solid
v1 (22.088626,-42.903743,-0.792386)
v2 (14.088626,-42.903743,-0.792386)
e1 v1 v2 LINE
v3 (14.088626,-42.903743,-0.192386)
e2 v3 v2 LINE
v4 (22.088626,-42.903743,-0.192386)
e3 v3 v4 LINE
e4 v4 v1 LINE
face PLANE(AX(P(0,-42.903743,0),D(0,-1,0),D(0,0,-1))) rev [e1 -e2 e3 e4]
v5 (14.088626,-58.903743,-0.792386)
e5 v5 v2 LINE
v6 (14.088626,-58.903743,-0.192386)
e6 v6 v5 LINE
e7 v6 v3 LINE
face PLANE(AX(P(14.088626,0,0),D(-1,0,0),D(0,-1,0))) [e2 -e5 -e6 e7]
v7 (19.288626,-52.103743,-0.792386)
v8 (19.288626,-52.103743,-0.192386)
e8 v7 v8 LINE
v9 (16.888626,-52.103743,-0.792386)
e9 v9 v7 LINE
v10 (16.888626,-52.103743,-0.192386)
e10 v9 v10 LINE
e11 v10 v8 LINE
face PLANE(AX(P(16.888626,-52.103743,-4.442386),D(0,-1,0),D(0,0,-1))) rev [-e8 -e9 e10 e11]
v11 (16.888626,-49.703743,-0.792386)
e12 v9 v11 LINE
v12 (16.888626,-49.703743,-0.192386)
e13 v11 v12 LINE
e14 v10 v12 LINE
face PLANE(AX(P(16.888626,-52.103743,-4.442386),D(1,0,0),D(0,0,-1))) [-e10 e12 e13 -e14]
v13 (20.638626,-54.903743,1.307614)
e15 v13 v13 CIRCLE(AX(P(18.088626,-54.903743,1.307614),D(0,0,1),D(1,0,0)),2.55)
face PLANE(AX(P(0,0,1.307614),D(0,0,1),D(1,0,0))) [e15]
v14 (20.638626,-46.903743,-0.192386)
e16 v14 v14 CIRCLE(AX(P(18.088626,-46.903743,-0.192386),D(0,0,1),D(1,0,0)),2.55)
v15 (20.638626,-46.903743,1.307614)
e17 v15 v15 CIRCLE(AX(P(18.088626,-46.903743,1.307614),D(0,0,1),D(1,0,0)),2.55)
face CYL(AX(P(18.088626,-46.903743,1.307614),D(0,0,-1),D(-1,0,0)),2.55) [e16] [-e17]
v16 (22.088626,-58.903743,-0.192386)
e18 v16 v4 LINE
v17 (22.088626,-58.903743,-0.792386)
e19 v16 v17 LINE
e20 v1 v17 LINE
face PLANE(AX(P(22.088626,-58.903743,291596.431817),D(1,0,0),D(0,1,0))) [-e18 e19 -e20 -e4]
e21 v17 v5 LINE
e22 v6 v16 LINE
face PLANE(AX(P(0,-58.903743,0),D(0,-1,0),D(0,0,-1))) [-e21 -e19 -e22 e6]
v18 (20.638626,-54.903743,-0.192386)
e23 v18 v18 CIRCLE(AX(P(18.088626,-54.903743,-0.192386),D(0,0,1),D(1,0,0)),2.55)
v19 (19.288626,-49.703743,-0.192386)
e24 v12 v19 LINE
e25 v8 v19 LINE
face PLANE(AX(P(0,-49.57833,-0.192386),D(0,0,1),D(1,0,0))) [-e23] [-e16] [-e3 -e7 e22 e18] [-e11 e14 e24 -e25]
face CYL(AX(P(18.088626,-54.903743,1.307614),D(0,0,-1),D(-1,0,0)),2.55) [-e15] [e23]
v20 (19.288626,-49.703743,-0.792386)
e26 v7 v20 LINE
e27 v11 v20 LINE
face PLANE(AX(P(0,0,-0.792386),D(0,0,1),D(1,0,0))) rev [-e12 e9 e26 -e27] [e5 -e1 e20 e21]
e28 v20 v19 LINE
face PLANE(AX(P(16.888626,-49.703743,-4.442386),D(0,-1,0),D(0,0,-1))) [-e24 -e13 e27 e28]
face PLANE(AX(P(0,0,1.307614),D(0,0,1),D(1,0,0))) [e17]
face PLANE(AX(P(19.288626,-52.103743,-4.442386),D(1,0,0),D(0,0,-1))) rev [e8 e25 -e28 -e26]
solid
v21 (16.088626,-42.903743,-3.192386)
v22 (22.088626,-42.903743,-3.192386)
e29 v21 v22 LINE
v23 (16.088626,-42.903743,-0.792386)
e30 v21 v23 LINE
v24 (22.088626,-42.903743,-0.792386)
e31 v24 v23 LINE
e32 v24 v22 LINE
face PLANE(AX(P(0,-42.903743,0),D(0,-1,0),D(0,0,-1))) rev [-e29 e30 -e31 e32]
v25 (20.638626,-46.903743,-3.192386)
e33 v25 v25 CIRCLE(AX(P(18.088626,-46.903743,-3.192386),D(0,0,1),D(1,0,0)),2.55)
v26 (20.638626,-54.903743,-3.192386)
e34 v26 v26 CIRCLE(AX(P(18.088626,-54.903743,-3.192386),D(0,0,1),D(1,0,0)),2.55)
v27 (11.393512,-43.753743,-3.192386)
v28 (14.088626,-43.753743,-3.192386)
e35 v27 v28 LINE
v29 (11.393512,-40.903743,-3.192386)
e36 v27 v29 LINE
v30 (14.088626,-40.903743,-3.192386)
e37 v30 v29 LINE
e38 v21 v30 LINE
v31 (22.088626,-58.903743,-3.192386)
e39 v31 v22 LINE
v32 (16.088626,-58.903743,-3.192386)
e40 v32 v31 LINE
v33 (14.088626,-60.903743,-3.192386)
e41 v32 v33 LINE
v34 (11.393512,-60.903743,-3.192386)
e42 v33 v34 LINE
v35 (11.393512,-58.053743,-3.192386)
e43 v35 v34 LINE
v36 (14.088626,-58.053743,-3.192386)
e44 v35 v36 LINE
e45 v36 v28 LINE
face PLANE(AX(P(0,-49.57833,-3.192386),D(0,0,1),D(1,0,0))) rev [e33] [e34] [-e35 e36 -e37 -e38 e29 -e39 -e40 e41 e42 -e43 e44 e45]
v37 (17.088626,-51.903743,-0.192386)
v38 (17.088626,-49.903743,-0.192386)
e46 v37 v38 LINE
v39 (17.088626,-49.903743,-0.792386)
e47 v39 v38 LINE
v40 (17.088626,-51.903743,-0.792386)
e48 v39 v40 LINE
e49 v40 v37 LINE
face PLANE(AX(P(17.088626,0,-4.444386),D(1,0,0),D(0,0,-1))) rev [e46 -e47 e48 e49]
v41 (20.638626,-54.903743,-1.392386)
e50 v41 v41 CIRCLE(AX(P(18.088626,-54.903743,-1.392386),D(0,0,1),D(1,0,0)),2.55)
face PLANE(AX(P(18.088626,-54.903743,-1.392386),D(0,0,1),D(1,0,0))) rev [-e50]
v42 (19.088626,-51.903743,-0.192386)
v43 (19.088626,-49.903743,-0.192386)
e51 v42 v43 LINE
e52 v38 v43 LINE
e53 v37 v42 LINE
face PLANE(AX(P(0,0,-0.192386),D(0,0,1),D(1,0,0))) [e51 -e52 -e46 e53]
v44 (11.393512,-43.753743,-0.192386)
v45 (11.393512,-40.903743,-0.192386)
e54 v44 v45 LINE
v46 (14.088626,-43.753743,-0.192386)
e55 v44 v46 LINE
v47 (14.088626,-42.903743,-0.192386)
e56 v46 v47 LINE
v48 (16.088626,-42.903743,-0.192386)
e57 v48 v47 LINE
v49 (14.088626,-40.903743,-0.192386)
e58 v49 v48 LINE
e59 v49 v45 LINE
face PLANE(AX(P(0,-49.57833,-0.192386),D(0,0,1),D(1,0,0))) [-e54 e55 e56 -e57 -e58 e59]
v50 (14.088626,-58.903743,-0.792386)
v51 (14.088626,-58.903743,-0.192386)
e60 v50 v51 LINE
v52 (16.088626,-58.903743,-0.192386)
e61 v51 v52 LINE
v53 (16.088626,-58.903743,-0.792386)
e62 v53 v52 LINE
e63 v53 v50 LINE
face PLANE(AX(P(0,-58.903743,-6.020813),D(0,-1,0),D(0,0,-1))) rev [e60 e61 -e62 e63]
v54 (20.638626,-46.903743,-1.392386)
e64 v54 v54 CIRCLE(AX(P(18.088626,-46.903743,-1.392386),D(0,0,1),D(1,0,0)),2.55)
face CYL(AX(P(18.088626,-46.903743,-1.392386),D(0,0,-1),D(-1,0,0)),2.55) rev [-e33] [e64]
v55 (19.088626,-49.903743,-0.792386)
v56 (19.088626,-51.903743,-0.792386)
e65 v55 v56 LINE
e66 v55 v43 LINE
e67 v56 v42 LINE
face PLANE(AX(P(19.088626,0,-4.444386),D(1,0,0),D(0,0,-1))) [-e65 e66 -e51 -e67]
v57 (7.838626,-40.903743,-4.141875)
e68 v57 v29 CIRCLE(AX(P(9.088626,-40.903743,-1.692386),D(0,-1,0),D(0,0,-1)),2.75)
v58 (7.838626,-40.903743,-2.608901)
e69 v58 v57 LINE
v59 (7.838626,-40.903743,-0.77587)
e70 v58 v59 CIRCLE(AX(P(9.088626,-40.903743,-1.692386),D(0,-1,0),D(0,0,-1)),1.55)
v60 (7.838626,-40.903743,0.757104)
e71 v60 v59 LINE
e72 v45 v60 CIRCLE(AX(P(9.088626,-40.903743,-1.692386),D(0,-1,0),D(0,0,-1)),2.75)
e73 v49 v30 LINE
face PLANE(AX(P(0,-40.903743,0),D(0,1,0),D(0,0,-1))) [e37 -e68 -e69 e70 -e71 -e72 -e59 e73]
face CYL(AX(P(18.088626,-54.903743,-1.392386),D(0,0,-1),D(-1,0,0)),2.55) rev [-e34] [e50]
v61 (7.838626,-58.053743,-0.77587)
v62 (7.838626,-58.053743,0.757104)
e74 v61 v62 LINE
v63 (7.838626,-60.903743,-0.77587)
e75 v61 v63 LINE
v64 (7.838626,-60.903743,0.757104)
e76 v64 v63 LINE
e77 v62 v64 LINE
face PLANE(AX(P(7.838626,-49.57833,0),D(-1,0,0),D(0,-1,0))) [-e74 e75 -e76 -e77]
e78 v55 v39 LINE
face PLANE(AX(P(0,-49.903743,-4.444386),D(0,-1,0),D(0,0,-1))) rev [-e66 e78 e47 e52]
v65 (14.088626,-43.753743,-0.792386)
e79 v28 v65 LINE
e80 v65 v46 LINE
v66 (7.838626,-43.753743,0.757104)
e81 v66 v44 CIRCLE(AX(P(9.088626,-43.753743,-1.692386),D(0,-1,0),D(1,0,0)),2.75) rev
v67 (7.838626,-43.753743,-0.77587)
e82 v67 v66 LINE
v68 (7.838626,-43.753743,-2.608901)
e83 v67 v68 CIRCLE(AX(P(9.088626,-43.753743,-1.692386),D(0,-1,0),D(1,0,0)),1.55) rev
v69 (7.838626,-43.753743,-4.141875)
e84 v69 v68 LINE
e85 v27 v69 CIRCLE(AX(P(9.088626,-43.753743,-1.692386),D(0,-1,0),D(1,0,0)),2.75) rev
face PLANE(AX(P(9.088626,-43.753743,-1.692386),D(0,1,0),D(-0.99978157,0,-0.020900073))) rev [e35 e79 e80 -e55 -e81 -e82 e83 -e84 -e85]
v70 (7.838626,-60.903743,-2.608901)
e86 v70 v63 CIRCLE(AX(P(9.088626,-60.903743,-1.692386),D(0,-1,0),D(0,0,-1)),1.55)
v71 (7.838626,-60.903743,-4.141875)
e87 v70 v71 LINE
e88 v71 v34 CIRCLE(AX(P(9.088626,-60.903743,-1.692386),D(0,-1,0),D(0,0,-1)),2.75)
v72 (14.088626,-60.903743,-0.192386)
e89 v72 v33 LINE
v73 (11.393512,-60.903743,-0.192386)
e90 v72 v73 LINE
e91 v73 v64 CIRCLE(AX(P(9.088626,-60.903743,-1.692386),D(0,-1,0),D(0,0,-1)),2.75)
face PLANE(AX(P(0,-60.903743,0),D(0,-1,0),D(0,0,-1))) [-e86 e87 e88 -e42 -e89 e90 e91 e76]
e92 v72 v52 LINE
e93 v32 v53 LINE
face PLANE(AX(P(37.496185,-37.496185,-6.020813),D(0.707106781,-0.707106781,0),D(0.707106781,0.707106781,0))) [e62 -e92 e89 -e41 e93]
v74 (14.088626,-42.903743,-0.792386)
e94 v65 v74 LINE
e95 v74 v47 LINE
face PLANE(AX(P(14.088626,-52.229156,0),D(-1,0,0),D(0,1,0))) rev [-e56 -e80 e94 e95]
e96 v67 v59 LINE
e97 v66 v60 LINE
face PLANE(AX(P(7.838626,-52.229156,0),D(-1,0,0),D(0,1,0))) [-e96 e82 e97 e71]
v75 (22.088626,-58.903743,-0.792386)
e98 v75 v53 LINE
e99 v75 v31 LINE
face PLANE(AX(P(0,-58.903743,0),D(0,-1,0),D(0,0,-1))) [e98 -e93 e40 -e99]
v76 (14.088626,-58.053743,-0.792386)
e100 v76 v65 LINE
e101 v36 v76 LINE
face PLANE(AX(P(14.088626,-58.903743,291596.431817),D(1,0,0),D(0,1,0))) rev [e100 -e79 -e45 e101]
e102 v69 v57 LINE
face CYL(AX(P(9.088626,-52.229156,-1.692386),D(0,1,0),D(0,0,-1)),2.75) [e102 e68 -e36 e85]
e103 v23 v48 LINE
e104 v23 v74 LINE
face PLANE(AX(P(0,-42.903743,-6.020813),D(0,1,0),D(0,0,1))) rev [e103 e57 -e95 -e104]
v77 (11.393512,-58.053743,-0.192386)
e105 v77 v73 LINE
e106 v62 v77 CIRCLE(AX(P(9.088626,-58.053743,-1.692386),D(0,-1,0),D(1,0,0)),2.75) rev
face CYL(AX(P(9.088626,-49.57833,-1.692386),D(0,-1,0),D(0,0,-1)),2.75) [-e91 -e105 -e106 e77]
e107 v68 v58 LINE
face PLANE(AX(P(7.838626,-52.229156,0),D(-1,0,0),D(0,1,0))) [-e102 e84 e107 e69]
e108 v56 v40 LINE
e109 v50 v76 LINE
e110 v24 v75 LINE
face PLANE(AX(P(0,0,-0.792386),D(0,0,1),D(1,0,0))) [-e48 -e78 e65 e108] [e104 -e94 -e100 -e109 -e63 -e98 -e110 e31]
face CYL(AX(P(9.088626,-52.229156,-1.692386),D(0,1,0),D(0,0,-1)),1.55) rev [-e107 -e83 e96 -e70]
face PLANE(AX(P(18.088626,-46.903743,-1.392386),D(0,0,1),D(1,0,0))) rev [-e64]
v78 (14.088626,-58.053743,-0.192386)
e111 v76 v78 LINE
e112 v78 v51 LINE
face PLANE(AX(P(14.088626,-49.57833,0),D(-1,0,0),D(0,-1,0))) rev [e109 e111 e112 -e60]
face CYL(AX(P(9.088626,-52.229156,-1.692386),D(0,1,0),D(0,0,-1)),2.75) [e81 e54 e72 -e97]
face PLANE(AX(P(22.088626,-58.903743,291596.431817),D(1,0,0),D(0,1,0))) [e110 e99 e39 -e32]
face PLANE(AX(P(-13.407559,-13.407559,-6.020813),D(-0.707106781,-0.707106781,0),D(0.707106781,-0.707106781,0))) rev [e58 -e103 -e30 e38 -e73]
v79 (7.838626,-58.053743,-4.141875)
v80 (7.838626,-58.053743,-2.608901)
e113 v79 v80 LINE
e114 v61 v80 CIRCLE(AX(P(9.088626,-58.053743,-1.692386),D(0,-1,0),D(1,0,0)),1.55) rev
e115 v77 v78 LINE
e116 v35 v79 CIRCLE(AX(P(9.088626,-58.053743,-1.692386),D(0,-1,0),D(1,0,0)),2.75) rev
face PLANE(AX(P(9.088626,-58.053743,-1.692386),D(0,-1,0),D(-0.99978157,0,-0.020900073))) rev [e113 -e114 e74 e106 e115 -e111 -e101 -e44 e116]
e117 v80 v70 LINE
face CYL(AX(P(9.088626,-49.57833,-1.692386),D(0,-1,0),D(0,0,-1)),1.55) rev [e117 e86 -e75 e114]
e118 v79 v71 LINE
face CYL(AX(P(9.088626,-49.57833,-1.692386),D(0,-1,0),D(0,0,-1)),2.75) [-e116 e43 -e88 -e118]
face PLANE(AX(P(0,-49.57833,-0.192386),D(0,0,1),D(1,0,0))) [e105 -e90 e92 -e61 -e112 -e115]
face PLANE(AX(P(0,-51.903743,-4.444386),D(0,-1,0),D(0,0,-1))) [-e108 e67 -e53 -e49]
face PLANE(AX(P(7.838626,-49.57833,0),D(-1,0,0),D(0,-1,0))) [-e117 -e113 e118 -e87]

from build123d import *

# Parameters (mm, degrees)
BOSS_EXTRUDE1_DEPTH = 2.85
BOSS_EXTRUDE2_START = -10
SKETCH1_3_W         = 8
SKETCH1_3_H         = 3
BOSS_EXTRUDE2_DEPTH = 8
SKETCH2_R           = 2.55
BOSS_EXTRUDE3_DEPTH = 1.5
CUT_EXTRUDE1_START  = -3
SKETCH2_4_R         = 2.55
CUT_EXTRUDE1_DEPTH  = 1.8
SPLIT1_START        = -0.792385575
SPLIT1_OUTLINE_R    = 2.55
SPLIT1_DEPTH        = 2.1
SPLIT1_2_OUTLINE_W  = 8
SPLIT1_2_OUTLINE_H  = 16
SPLIT1_2_OUTLINE_R  = 2.55
SPLIT1_2_DEPTH      = 0.6
SPLIT1_START_2      = 14.088625645
SPLIT1_3_OUTLINE_W  = 16
SPLIT1_3_OUTLINE_H  = 2.1
SPLIT1_3_DEPTH      = 8
SKETCH3_W           = 2.4
SKETCH3_H           = 2.4
SKETCH3_W_2         = 2
SKETCH3_H_2         = 2
CUT_EXTRUDE2_DEPTH  = 65.924847621
BOSS_EXTRUDE4_REACH = 66.925
SKETCH3_3_W         = 2
SKETCH3_3_H         = 2
BOSS_EXTRUDE5_REACH = 66.925


# Read off the part's stored shape, not the designer's step: Split1
with BuildPart() as part:
    # Sketch1 → Boss-Extrude1 (new body)
    with BuildSketch(Plane.XZ.offset(60.903743363)):
        with BuildLine():
            ThreePointArc((11.39351176, -0.192385575), (9.798258558, 0.964477449), (7.838625645, 0.757104168))
            Line((7.838625645, 0.757104168), (7.838625645, -0.775870436))
            ThreePointArc((7.838625645, -0.775870436), (9.570808183, -0.219293589), (10.638625645, -1.692385575))
            ThreePointArc((10.638625645, -1.692385575), (9.570808183, -3.165477561), (7.838625645, -2.608900714))
            Line((7.838625645, -2.608900714), (7.838625645, -4.141875318))
            ThreePointArc((7.838625645, -4.141875318), (9.798258558, -4.349248599), (11.39351176, -3.192385575))
            ThreePointArc((11.39351176, -3.192385575), (11.724999748, -2.474710055), (11.838625645, -1.692385575))
            ThreePointArc((11.838625645, -1.692385575), (11.724999748, -0.910061094), (11.39351176, -0.192385575))
        make_face()
        with BuildLine():
            Line((14.088625645, -0.192385575), (11.39351176, -0.192385575))
            ThreePointArc((11.39351176, -0.192385575), (11.724999748, -0.910061094), (11.838625645, -1.692385575))
            ThreePointArc((11.838625645, -1.692385575), (11.724999748, -2.474710055), (11.39351176, -3.192385575))
            Line((11.39351176, -3.192385575), (14.088625645, -3.192385575))
            Line((14.088625645, -3.192385575), (14.088625645, -0.192385575))
        make_face()
    extrude(amount=-BOSS_EXTRUDE1_DEPTH)


with BuildPart() as body_2:
    # Mirror3: mirrored copy
    add(part.part.mirror(Plane(origin=(0, -50.903743363, 0), x_dir=(0, 0, 1), z_dir=(0, -1, 0))))


with BuildPart() as part_1:
    add(part.part)

    add(body_2.part)  # Boss-Extrude2 merges body 2
    # Sketch1<3> → Boss-Extrude2 (add, symmetric)
    with BuildSketch(Plane.XZ.offset(60.903743363).offset(BOSS_EXTRUDE2_START)):
        with Locations((18.088625645, -1.692385575)):
            Rectangle(SKETCH1_3_W, SKETCH1_3_H)
    extrude(amount=BOSS_EXTRUDE2_DEPTH, both=True)

    # Sketch2 → Boss-Extrude3 (add)
    with BuildSketch(Plane.XY.offset(-0.192385575)):
        with Locations((18.088625645, -54.903743363)):
            Circle(SKETCH2_R)
        with Locations((18.088625645, -46.903743363)):
            Circle(SKETCH2_R)
    extrude(amount=BOSS_EXTRUDE3_DEPTH)

    # Sketch2<4> → Cut-Extrude1 (cut)
    with BuildSketch(Plane.XY.offset(-0.192385575).offset(CUT_EXTRUDE1_START)):
        with Locations((18.088625645, -54.903743363)):
            Circle(SKETCH2_4_R)
        with Locations((18.088625645, -46.903743363)):
            Circle(SKETCH2_4_R)
    extrude(amount=CUT_EXTRUDE1_DEPTH, mode=Mode.SUBTRACT)

    # Split1 3 outline → Split1 3 (cut)
    with BuildSketch(Plane.YZ.offset(SPLIT1_START_2)):
        with Locations((-50.903743363, 0.257614425)):
            Rectangle(SPLIT1_3_OUTLINE_W, SPLIT1_3_OUTLINE_H)
    extrude(amount=SPLIT1_3_DEPTH, mode=Mode.SUBTRACT)

    # Sketch3<3> → Boss-Extrude4 (add, up to next)
    with BuildSketch(Plane.XY.offset(-0.192385575), mode=Mode.PRIVATE) as boss_extrude4_sk1:
        with Locations((18.088625645, -50.903743363)):
            Rectangle(SKETCH3_3_W, SKETCH3_3_H)
    boss_extrude4_tool1 = extrude(boss_extrude4_sk1.sketch, amount=-BOSS_EXTRUDE4_REACH, mode=Mode.PRIVATE) - part_1.part
    add(boss_extrude4_tool1.solids().sort_by_distance((18.088626, -50.903743, -0.192386))[0])

    # Boss-Extrude5: up to this face of the body (flat: up to its plane)
    boss_extrude5_end = Plane(part_1.part.faces().sort_by_distance((17.287207403, -50.903743363, -3.192385575))[0])
    # Sketch2<6> → Boss-Extrude5 (add, up to the picked face)
    with BuildSketch(Plane.XY.offset(-0.192385575), mode=Mode.PRIVATE) as boss_extrude5_sk1:
        Polygon((14.088625645, -58.903743363), (14.088625645, -60.903743363), (16.088625645, -58.903743363), align=None)
    boss_extrude5_tool1 = split(extrude(boss_extrude5_sk1.sketch, amount=-BOSS_EXTRUDE5_REACH, mode=Mode.PRIVATE), bisect_by=boss_extrude5_end, keep=Keep.BOTH, mode=Mode.PRIVATE)
    # Sketch2<6> → Boss-Extrude5 (add, up to the picked face)
    with BuildSketch(Plane.XY.offset(-0.192385575), mode=Mode.PRIVATE) as boss_extrude5_sk2:
        Polygon((16.088625645, -42.903743363), (14.088625645, -40.903743363), (14.088625645, -42.903743363), align=None)
    boss_extrude5_tool2 = split(extrude(boss_extrude5_sk2.sketch, amount=-BOSS_EXTRUDE5_REACH, mode=Mode.PRIVATE), bisect_by=boss_extrude5_end, keep=Keep.BOTH, mode=Mode.PRIVATE)
    add(boss_extrude5_tool1.solids().sort_by(Axis((14.755292, -59.57041, -0.192386), (0, 0, -1)))[0])
    add(boss_extrude5_tool2.solids().sort_by(Axis((14.755292, -42.237077, -0.192386), (0, 0, -1)))[0])


with BuildPart() as body_2_2:
    # Split1 outline → Split1 (new body)
    with BuildSketch(Plane.XY.offset(SPLIT1_START)):
        with Locations((18.088625645, -46.903743363)):
            Circle(SPLIT1_OUTLINE_R)
        with Locations((18.088625645, -54.903743363)):
            Circle(SPLIT1_OUTLINE_R)
    extrude(amount=SPLIT1_DEPTH)

    # Split1 2 outline → Split1 2 (add)
    with BuildSketch(Plane.XY.offset(SPLIT1_START)):
        with Locations((18.088625645, -50.903743363)):
            Rectangle(SPLIT1_2_OUTLINE_W, SPLIT1_2_OUTLINE_H)
        with Locations((18.088625645, -54.903743363)):
            Circle(SPLIT1_2_OUTLINE_R, mode=Mode.SUBTRACT)
        with Locations((18.088625645, -46.903743363)):
            Circle(SPLIT1_2_OUTLINE_R, mode=Mode.SUBTRACT)
    extrude(amount=SPLIT1_2_DEPTH)

    # Sketch3 → Cut-Extrude2 (cut, through all)
    with BuildSketch(Plane.XY.offset(-0.192385575)):
        with Locations((18.088625645, -50.903743363)):
            Rectangle(SKETCH3_W, SKETCH3_H)
        with Locations((18.088625645, -50.903743363)):
            Rectangle(SKETCH3_W_2, SKETCH3_H_2, mode=Mode.SUBTRACT)
    extrude(amount=-CUT_EXTRUDE2_DEPTH, mode=Mode.SUBTRACT)


with BuildPart() as cut_extrude2_kept_piece:
    # of the separate pieces the step leaves, the one the design keeps (cut_extrude2_pieces_kept)
    add(body_2_2.part.solids().sort_by_distance((20.638625645, -46.903743363, -0.192385575))[0])


solid = Compound([part_1.part, cut_extrude2_kept_piece.part])
